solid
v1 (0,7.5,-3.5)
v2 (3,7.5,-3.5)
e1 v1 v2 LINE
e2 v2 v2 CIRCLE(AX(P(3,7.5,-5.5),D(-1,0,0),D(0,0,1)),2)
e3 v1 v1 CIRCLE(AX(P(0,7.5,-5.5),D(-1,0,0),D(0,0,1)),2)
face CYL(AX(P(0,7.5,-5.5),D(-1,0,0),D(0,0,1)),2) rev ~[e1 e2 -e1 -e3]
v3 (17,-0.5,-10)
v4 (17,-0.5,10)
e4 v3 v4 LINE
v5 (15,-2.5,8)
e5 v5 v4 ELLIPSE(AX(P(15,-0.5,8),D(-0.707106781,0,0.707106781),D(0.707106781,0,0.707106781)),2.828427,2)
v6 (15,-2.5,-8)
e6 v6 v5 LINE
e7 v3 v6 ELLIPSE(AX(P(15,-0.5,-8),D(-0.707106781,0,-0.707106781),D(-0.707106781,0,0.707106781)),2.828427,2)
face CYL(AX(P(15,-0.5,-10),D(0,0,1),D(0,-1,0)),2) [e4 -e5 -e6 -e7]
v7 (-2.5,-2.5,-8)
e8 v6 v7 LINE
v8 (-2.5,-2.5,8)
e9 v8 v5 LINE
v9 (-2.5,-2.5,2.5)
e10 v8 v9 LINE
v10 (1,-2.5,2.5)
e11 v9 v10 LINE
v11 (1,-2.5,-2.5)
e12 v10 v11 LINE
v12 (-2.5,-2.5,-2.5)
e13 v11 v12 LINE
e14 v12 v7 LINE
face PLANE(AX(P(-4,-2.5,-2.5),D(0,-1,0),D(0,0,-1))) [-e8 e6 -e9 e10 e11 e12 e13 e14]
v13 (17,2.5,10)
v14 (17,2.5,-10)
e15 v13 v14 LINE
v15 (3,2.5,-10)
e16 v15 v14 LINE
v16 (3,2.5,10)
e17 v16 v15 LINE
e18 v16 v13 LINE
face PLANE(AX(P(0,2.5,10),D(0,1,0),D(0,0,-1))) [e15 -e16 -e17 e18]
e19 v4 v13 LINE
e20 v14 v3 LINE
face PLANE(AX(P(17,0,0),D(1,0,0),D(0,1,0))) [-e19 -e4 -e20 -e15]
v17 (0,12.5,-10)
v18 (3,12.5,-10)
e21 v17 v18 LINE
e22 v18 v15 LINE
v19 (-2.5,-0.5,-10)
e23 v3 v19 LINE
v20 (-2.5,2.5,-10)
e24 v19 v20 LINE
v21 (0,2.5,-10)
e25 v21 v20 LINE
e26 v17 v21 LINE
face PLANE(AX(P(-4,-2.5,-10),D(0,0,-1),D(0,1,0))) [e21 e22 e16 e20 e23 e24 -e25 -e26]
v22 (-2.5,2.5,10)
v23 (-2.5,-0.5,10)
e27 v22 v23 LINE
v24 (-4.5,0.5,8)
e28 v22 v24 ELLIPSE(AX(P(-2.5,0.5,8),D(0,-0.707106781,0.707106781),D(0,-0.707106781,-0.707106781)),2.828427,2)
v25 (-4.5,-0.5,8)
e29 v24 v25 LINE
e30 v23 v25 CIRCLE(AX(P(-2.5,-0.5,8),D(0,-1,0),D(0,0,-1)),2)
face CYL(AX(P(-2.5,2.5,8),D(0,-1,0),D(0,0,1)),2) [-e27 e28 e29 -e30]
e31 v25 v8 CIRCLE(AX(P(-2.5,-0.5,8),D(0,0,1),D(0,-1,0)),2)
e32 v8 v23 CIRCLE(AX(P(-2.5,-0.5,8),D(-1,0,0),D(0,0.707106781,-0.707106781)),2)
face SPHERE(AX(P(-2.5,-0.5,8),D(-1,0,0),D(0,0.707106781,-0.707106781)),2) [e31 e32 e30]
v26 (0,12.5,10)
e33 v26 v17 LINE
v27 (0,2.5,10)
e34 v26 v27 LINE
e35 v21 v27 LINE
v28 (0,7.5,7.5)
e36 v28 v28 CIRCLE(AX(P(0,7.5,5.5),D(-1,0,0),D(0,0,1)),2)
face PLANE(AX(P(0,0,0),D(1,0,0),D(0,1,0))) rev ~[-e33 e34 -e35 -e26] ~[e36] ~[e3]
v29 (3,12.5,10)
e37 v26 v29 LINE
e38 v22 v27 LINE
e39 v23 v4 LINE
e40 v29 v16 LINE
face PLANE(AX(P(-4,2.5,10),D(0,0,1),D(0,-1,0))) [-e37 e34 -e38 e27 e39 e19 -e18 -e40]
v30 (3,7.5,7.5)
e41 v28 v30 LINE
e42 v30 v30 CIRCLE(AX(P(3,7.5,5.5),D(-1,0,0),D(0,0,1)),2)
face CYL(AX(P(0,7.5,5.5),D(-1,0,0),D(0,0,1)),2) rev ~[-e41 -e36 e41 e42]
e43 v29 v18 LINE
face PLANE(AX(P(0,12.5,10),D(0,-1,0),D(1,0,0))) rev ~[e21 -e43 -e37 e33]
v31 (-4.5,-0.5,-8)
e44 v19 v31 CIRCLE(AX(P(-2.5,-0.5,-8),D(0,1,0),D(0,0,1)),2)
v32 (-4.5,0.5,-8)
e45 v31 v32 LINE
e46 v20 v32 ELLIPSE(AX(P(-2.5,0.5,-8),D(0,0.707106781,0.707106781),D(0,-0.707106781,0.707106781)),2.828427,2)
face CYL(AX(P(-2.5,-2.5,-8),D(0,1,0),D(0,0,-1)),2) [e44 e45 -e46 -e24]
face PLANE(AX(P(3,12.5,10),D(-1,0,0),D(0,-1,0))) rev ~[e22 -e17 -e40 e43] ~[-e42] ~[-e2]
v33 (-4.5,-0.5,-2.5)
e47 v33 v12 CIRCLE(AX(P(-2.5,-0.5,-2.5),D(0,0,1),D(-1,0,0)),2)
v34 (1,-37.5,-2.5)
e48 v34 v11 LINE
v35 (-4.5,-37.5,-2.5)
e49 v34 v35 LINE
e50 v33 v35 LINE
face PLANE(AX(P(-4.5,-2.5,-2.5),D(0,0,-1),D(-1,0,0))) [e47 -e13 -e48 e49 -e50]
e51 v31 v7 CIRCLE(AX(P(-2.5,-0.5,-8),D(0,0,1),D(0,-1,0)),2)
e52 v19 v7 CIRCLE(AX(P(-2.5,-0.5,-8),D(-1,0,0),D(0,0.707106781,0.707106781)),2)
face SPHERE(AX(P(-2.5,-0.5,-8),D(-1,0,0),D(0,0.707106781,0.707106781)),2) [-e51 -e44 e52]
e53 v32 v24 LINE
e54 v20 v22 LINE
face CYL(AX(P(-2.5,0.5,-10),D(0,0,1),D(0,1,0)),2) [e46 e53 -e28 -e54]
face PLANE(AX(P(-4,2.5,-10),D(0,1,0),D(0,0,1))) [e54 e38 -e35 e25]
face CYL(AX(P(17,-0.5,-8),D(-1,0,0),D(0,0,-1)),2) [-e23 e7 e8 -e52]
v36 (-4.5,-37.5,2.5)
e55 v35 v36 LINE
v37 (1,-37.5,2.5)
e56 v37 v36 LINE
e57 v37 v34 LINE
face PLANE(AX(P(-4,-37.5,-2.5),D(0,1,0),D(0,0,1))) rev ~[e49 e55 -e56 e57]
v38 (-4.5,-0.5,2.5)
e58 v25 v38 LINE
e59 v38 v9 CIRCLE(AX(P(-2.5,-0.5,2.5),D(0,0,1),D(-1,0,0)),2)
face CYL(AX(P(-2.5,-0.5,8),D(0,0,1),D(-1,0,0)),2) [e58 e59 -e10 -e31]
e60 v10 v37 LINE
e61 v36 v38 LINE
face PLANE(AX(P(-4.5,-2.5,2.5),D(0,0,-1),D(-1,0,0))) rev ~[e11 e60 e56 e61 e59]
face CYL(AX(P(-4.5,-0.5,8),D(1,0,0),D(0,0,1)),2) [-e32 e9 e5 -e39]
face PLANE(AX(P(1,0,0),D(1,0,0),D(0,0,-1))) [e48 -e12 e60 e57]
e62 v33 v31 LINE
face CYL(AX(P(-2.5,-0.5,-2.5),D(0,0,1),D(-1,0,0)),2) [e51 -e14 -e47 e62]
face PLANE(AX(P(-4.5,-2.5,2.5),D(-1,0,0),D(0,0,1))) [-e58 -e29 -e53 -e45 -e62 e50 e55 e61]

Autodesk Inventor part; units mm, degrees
ref_plane "YZ Plane" through (0, 0, 0) normal (1, 0, 0) x (0, 1, 0)
ref_plane "XZ Plane" through (0, 0, 0) normal (0, 1, 0) x (-1, 0, 0)
ref_plane "XY Plane" through (0, 0, 0) normal (0, 0, 1) x (1, 0, 0)
sketch "Sketch1" plane through (0, 0, 0) normal (1, 0, 0) x (0, 1, 0)
  line L0 (-2.5, 10) -> (2.5, 10)
  line L1 (2.5, 10) -> (2.5, -10)
  line L2 (2.5, -10) -> (-2.5, -10)
  line L3 (-2.5, -10) -> (-2.5, 10)
  line L4 (-2.5, 10) -> (2.5, -10) construction
  line L5 (2.5, 10) -> (-2.5, -10) construction
  point P0 (0, 0)
  dimension "d0" = 5
  dimension "d1" = 20
extrude "Extrusion1" add sketch "Sketch1" along normal blind 17
sketch "Sketch3" plane through (0, -2.5, 10) normal (0, 0, 1) x (1, 0, 0)
  line L0 (3, 5) -> (0, 5)
  line L1 (0, 5) -> (0, 15)
  line L2 (0, 15) -> (3, 15)
  line L3 (3, 15) -> (3, 5)
  point P0 (0, 2.5)
  dimension "d8" = 3
  dimension "d9" = 10
extrude "Extrusion3" add sketch "Sketch3" against normal up to surface (20 mm away)
sketch "Sketch4" plane through (0, 0, 0) normal (-1, 0, 0) x (0, 0, 1)
  circle A0 centre (-121.4441, 7.5) radius 2 projected
  circle A1 centre (-132.4441, 7.5) radius 2 projected
  point P0 (0, 0)
extrude "Extrusion4" cut sketch "Sketch4" against normal through all
sketch "Sketch5" plane through (0, 0, 0) normal (-1, 0, 0) x (0, 0, 1)
  line L0 (-2.5, -37.5) -> (-2.5, -2.5) projected
  line L1 (-10, -2.5) -> (10, -2.5) projected
  line L2 (2.5, -2.5) -> (2.5, -37.5) projected
  line L3 (2.5, -37.5) -> (-2.5, -37.5) projected
  point P0 (0, 0)
extrude "Extrusion5" add sketch "Sketch5" against normal blind 5
sketch "Sketch6" plane through (0, 0, 0) normal (-1, 0, 0) x (0, 0, 1)
  circle A0 centre (-5.5, 7.5) radius 2 projected
  circle A1 centre (5.5, 7.5) radius 2 projected
  point P0 (0, 0)
extrude "Extrusion6" cut sketch "Sketch6" against normal blind 10
ref_plane "Work Plane1" through (0, -2.5, -10) normal (0, -1, 0) x (1, 0, 0)
split_face "Split1"
sketch "Sketch7" plane through (0, -2.5, 2.5) normal (-1, 0, 0) x (0, 0, 1)
  line L0 (-12.5, 5) -> (7.5, 5) projected
  line L1 (-5, 0) -> (0, 0) projected
  line L2 (7.5, 0) -> (0, 0) projected
  line L3 (7.5, 15) -> (7.5, 0) projected
  line L4 (7.5, 15) -> (-12.5, 15) projected
  line L5 (-12.5, 0) -> (-12.5, 15) projected
  line L6 (-5, 0) -> (-12.5, 0) projected
  circle A0 centre (3, 10) radius 2 projected
  circle A1 centre (-8, 10) radius 2 projected
  line L7 (-5, 0) -> (0, 0) projected
  line L8 (-5, 0) -> (-5, -35) projected
  line L9 (-5, -35) -> (0, -35) projected
  line L10 (0, -35) -> (0, 0) projected
  point P0 (-2.5, 2.5)
extrude "Extrusion7" add sketch "Sketch7" along normal blind 4 contours L0 L3 L2 L1 L6 L5 | L1 L10 L9 L8
sketch "Sketch8" plane through (5, 0, 0) normal (1, 0, 0) x (0, 0, -1)
  line L0 (-2.5, -2.5) -> (-2.5, -37.5) projected
  line L1 (-2.5, -37.5) -> (2.5, -37.5) projected
  line L2 (2.5, -37.5) -> (2.5, -2.5) projected
  line L3 (-2.5, -2.5) -> (2.5, -2.5) projected
  point P0 (0, 0)
extrude "Extrusion8" cut sketch "Sketch8" against normal blind 4
move faces "Move1" translate (-0.5, 0, 0) faces at (-4, -14.1667, 0.8333)
fillet "Fillet3" radius 2 6 edges at (6.25, -2.5, -10) (17, -2.5, 0) (6.25, -2.5, 10) (-4.5, 0, 10) (-4.5, 2.5, 0) (-4.5, 0, -10)
fillet "Fillet4" radius 2 4 edges at (-4.5, -2.5, 5.25) (-3.9142, -1.9142, 9.4142) (-4.5, -2.5, -5.25) (-3.9142, -1.9142, -9.4142)
sketch "Sketch11" plane through (15, -2.5, -8) normal (0, -1, 0) x (1, 0, 0)
  point P0 (-15, 8)
sketch "Sketch2" plane through (17, 0, 0) normal (1, 0, 0) x (0, 0, -1)
  line L0 (-2.4746, -2.5) -> (2.5254, -2.5)
  line L1 (2.5254, -2.5) -> (2.5254, -37.5)
  line L2 (2.5254, -37.5) -> (-2.4746, -37.5)
  line L3 (-2.4746, -37.5) -> (-2.4746, -2.5)
  line L4 (-10, -2.5) -> (10, -2.5) projected
  line L5 (2.5254, -2.5) -> (2.5254, 0)
  line L6 (-2.4746, -2.5) -> (-2.4746, -0.5)
  line L7 (10, -0.5) -> (-10, -0.5) projected
  line L8 (2.5254, 0) -> (-2.2155, 0)
  line L9 (-2.4746, -0.5) -> (-2.4746, 0)
  line L10 (-2.4746, 0) -> (-2.1408, 0)
  point P0 (0, 0)
  dimension "d4" = 5
  dimension "d5" = 35
sketch "Sketch12" plane through (15, -2.5, -8) normal (0, -1, 0) x (1, 0, 0)
  point P0 (-15, 8)
properties part number "reverse_finger"
